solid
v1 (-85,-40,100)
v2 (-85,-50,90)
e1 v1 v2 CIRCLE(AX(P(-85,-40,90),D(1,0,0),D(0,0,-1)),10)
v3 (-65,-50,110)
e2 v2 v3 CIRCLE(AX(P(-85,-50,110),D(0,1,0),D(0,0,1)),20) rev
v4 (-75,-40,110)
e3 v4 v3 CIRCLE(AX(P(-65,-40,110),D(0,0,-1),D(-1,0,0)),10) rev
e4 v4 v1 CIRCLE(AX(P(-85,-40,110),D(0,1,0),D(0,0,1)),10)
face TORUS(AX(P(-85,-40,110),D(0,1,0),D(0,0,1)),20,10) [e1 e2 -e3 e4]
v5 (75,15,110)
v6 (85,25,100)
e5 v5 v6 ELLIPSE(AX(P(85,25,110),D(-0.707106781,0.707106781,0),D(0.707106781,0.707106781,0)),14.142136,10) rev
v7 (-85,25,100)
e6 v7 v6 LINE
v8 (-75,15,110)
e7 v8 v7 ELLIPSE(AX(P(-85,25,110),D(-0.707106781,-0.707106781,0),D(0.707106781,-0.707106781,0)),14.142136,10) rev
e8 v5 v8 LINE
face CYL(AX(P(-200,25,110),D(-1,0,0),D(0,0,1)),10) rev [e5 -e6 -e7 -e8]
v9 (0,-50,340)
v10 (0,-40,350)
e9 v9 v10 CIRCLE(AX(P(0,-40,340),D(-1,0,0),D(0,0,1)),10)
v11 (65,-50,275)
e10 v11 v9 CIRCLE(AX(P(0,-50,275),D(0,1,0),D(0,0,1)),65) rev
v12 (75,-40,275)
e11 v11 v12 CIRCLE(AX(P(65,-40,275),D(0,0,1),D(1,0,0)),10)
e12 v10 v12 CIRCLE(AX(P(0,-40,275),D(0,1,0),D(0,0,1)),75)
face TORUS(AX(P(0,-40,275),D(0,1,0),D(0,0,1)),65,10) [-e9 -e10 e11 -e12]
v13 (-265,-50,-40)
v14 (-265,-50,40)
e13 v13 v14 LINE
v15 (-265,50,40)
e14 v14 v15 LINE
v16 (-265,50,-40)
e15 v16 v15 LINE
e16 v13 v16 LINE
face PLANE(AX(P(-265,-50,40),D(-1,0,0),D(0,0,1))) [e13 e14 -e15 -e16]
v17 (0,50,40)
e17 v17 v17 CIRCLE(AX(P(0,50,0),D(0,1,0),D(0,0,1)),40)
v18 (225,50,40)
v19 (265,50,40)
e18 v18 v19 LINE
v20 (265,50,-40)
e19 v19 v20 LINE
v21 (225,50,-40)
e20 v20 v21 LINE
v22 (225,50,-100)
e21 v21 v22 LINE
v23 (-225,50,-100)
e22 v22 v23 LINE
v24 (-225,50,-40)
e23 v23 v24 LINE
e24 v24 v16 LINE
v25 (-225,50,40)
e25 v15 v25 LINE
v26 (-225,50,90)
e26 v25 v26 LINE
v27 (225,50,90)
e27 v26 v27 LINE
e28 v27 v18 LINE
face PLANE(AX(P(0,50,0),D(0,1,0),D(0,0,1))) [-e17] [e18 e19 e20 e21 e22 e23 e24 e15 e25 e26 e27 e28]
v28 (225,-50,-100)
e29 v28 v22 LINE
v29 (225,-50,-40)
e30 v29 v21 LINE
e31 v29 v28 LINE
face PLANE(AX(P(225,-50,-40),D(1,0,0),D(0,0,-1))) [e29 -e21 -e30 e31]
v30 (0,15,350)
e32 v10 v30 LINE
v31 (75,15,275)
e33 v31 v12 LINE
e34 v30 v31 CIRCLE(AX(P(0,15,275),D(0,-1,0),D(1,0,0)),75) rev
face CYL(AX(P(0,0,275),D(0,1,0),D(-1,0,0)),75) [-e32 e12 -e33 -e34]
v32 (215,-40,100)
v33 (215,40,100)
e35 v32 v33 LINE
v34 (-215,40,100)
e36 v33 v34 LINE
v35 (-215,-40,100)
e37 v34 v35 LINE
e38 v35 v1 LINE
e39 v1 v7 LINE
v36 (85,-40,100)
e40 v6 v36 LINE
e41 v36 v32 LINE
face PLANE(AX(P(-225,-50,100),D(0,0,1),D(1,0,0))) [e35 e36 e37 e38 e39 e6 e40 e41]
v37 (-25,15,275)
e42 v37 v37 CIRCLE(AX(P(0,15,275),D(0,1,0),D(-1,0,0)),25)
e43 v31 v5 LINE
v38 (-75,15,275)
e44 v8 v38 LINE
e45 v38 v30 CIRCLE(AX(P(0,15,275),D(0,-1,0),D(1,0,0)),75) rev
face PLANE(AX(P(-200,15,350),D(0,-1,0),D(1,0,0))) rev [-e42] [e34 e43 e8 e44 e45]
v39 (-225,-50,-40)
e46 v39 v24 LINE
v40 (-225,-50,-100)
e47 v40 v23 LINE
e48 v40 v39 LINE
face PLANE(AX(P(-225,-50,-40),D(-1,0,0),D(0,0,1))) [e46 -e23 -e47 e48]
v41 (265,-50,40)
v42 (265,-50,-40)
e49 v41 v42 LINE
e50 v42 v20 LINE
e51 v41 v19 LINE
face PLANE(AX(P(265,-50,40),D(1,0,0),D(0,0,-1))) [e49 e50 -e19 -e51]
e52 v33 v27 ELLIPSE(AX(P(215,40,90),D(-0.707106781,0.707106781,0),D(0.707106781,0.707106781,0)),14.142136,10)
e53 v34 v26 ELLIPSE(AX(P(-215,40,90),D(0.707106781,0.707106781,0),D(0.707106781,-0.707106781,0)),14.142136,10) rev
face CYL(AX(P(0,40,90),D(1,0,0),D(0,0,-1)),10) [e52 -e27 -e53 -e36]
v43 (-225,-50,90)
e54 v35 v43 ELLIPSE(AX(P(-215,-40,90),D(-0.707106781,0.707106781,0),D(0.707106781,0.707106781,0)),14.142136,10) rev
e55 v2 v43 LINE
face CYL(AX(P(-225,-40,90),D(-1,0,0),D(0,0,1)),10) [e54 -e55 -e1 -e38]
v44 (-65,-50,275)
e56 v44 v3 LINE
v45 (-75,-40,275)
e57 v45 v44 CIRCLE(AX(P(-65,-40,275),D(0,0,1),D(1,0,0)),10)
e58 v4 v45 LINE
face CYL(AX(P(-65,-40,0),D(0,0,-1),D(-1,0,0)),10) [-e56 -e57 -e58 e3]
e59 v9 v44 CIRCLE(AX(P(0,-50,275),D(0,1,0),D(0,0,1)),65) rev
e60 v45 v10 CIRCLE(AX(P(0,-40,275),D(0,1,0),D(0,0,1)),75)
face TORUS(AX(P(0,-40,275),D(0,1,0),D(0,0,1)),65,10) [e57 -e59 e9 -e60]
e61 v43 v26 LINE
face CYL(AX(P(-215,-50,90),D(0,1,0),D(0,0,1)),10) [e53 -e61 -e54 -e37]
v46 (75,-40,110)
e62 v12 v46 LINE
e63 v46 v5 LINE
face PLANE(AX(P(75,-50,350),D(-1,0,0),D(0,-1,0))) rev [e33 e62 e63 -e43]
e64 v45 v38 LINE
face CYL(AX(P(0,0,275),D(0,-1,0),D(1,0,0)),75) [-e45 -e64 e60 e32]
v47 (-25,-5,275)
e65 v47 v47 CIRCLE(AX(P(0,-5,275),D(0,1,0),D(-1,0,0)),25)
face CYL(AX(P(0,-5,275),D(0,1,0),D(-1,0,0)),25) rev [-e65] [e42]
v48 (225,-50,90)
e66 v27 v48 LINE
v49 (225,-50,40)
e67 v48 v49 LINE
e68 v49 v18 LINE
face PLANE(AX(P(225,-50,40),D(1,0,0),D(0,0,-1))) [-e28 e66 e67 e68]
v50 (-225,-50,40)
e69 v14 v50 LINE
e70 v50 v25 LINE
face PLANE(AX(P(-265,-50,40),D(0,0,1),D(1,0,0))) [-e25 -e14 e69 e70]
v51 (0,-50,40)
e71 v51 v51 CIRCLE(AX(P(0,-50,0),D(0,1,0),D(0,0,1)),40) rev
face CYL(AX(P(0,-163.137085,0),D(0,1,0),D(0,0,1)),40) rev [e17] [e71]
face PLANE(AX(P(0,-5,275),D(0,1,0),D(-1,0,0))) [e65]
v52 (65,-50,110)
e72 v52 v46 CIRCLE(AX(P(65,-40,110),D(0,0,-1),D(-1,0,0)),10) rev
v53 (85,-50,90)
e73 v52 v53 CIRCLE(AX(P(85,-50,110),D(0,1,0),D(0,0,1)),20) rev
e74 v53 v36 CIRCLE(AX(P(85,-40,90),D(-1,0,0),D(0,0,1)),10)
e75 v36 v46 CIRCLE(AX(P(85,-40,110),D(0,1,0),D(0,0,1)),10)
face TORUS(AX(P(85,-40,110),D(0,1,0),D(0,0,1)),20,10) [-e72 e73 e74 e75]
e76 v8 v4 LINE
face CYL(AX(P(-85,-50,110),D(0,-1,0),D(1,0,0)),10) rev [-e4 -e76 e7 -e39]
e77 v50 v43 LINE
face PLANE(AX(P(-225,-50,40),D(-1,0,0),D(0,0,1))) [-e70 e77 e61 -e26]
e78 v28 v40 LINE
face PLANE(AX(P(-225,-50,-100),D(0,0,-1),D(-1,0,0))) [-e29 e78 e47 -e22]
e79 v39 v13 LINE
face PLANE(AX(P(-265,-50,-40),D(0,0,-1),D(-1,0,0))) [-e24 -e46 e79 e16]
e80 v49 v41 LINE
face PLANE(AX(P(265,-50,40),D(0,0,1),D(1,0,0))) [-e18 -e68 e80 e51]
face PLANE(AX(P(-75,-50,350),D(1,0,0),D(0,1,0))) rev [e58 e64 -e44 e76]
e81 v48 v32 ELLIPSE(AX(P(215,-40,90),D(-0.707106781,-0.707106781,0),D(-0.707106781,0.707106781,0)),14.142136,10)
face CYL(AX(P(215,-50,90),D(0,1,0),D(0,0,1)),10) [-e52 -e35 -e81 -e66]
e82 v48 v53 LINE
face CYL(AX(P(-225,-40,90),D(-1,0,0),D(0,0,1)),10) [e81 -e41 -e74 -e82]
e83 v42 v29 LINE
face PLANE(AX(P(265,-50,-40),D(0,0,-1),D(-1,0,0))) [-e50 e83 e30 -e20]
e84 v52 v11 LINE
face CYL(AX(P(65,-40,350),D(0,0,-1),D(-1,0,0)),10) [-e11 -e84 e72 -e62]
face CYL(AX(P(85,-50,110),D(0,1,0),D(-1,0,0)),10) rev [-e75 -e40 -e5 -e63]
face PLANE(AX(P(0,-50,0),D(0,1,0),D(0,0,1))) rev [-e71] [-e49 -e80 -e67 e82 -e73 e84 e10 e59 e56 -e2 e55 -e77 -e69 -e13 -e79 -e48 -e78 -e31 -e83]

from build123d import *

# Parameters (mm, degrees)
AUFSATZ_LINEAR_AUSTRAGEN1_DEPTH      = 50
AUFSATZ_LINEAR_AUSTRAGEN1_DEPTH_BACK = 50
SKIZZE4_R                            = 40
SCHNITT_LINEAR_AUSTRAGEN1_DEPTH      = 100
SKIZZE5_W                            = 150
SKIZZE5_H                            = 100
AUFSATZ_LINEAR_AUSTRAGEN2_DEPTH      = 250
VERRUNDUNG2_R                        = 75
SCHNITT_LINEAR_AUSTRAGEN3_REACH      = 492.51
SKIZZE8_W                            = 120
SKIZZE8_H                            = 35
SKIZZE9_R                            = 25
SCHNITT_LINEAR_AUSTRAGEN4_DEPTH      = 20
SKIZZE10_W                           = 150
SKIZZE10_H                           = 130
SCHNITT_LINEAR_AUSTRAGEN5_DEPTH      = 35
VERRUNDUNG3_R                        = 10


with BuildPart() as part:
    # Skizze3 → Aufsatz-Linear austragen1 (new, two sides: drawn at the far end of the back side and taken through both)
    with BuildSketch(Plane(origin=(0, 0, 0), x_dir=(1, 0, 0), z_dir=(0, 1, 0)).offset(-AUFSATZ_LINEAR_AUSTRAGEN1_DEPTH_BACK)):
        Polygon((-265, -40), (-265, 40), (-225, 40), (-225, 100), (225, 100), (225, 40), (265, 40), (265, -40), (225, -40), (225, -100), (-225, -100), (-225, -40), align=None)
    extrude(amount=AUFSATZ_LINEAR_AUSTRAGEN1_DEPTH + AUFSATZ_LINEAR_AUSTRAGEN1_DEPTH_BACK)

    # Skizze4 → Schnitt-Linear austragen1 (cut)
    with BuildSketch(Plane(origin=(0, 50, 0), x_dir=(1, 0, 0), z_dir=(0, 1, 0))):
        with Locations(Location((0, 0, 0), (0, 0, 270))):
            Circle(SKIZZE4_R)
    extrude(amount=-SCHNITT_LINEAR_AUSTRAGEN1_DEPTH, mode=Mode.SUBTRACT)

    # Skizze5 → Aufsatz-Linear austragen2 (add)
    with BuildSketch(Plane.XY.offset(100)):
        Rectangle(SKIZZE5_W, SKIZZE5_H)
    extrude(amount=AUFSATZ_LINEAR_AUSTRAGEN2_DEPTH)

    # Verrundung2
    verrundung2_edges = [part.edges().sort_by_distance(p)[0] for p in [
        (-75, 0, 350),
        (75, 0, 350),
    ]]
    fillet(verrundung2_edges, radius=VERRUNDUNG2_R - 0.0001)  # a hair under: the kernel refuses the full size

    # Schnitt-Linear austragen3: up to this face of the body (flat: up to its plane)
    schnitt_linear_austragen3_end = Plane(part.part.faces().sort_by_distance((-75, 0, 187.50005))[0])
    # Skizze8 → Schnitt-Linear austragen3 (cut, up to the picked face)
    with BuildSketch(Plane(origin=(75, 0, 0), x_dir=(0, 0, -1), z_dir=(1, 0, 0)), mode=Mode.PRIVATE) as schnitt_linear_austragen3_sk1:
        with Locations((-290, 32.5)):
            Rectangle(SKIZZE8_W, SKIZZE8_H)
    schnitt_linear_austragen3_tool1 = split(extrude(schnitt_linear_austragen3_sk1.sketch, amount=-SCHNITT_LINEAR_AUSTRAGEN3_REACH, mode=Mode.PRIVATE), bisect_by=schnitt_linear_austragen3_end, keep=Keep.BOTH, mode=Mode.PRIVATE)
    add(schnitt_linear_austragen3_tool1.solids().sort_by(Axis((75, 32.5, 290), (-1, 0, 0)))[0], mode=Mode.SUBTRACT)

    # Skizze9 → Schnitt-Linear austragen4 (cut)
    with BuildSketch(Plane(origin=(0, 15, 0), x_dir=(1, 0, 0), z_dir=(0, 1, 0))):
        with Locations(Location((0, -275, 0), (0, 0, 180))):
            Circle(SKIZZE9_R)
    extrude(amount=-SCHNITT_LINEAR_AUSTRAGEN4_DEPTH, mode=Mode.SUBTRACT)

    # Skizze10 → Schnitt-Linear austragen5 (cut)
    with BuildSketch(Plane(origin=(0, 50, 0), x_dir=(1, 0, 0), z_dir=(0, 1, 0))):
        with Locations((0, -165)):
            Rectangle(SKIZZE10_W, SKIZZE10_H)
    extrude(amount=-SCHNITT_LINEAR_AUSTRAGEN5_DEPTH, mode=Mode.SUBTRACT)

    # Verrundung3
    verrundung3_edges = [part.edges().sort_by_distance(p)[0] for p in [
        (-75, -17.5, 100),
        (0, 15, 100),
        (-150, -50, 100),
        (225, 0, 100),
        (-225, 0, 100),
        (0, 50, 100),
        (150, -50, 100),
        (75, -17.5, 100),
        (75, -50, 187.50005),
        (-75, -50, 187.50005),
        (53.033037878, -50, 328.033037878),
        (-53.033037878, -50, 328.033037878),
    ]]
    fillet(verrundung3_edges, radius=VERRUNDUNG3_R)


solid = part.part
